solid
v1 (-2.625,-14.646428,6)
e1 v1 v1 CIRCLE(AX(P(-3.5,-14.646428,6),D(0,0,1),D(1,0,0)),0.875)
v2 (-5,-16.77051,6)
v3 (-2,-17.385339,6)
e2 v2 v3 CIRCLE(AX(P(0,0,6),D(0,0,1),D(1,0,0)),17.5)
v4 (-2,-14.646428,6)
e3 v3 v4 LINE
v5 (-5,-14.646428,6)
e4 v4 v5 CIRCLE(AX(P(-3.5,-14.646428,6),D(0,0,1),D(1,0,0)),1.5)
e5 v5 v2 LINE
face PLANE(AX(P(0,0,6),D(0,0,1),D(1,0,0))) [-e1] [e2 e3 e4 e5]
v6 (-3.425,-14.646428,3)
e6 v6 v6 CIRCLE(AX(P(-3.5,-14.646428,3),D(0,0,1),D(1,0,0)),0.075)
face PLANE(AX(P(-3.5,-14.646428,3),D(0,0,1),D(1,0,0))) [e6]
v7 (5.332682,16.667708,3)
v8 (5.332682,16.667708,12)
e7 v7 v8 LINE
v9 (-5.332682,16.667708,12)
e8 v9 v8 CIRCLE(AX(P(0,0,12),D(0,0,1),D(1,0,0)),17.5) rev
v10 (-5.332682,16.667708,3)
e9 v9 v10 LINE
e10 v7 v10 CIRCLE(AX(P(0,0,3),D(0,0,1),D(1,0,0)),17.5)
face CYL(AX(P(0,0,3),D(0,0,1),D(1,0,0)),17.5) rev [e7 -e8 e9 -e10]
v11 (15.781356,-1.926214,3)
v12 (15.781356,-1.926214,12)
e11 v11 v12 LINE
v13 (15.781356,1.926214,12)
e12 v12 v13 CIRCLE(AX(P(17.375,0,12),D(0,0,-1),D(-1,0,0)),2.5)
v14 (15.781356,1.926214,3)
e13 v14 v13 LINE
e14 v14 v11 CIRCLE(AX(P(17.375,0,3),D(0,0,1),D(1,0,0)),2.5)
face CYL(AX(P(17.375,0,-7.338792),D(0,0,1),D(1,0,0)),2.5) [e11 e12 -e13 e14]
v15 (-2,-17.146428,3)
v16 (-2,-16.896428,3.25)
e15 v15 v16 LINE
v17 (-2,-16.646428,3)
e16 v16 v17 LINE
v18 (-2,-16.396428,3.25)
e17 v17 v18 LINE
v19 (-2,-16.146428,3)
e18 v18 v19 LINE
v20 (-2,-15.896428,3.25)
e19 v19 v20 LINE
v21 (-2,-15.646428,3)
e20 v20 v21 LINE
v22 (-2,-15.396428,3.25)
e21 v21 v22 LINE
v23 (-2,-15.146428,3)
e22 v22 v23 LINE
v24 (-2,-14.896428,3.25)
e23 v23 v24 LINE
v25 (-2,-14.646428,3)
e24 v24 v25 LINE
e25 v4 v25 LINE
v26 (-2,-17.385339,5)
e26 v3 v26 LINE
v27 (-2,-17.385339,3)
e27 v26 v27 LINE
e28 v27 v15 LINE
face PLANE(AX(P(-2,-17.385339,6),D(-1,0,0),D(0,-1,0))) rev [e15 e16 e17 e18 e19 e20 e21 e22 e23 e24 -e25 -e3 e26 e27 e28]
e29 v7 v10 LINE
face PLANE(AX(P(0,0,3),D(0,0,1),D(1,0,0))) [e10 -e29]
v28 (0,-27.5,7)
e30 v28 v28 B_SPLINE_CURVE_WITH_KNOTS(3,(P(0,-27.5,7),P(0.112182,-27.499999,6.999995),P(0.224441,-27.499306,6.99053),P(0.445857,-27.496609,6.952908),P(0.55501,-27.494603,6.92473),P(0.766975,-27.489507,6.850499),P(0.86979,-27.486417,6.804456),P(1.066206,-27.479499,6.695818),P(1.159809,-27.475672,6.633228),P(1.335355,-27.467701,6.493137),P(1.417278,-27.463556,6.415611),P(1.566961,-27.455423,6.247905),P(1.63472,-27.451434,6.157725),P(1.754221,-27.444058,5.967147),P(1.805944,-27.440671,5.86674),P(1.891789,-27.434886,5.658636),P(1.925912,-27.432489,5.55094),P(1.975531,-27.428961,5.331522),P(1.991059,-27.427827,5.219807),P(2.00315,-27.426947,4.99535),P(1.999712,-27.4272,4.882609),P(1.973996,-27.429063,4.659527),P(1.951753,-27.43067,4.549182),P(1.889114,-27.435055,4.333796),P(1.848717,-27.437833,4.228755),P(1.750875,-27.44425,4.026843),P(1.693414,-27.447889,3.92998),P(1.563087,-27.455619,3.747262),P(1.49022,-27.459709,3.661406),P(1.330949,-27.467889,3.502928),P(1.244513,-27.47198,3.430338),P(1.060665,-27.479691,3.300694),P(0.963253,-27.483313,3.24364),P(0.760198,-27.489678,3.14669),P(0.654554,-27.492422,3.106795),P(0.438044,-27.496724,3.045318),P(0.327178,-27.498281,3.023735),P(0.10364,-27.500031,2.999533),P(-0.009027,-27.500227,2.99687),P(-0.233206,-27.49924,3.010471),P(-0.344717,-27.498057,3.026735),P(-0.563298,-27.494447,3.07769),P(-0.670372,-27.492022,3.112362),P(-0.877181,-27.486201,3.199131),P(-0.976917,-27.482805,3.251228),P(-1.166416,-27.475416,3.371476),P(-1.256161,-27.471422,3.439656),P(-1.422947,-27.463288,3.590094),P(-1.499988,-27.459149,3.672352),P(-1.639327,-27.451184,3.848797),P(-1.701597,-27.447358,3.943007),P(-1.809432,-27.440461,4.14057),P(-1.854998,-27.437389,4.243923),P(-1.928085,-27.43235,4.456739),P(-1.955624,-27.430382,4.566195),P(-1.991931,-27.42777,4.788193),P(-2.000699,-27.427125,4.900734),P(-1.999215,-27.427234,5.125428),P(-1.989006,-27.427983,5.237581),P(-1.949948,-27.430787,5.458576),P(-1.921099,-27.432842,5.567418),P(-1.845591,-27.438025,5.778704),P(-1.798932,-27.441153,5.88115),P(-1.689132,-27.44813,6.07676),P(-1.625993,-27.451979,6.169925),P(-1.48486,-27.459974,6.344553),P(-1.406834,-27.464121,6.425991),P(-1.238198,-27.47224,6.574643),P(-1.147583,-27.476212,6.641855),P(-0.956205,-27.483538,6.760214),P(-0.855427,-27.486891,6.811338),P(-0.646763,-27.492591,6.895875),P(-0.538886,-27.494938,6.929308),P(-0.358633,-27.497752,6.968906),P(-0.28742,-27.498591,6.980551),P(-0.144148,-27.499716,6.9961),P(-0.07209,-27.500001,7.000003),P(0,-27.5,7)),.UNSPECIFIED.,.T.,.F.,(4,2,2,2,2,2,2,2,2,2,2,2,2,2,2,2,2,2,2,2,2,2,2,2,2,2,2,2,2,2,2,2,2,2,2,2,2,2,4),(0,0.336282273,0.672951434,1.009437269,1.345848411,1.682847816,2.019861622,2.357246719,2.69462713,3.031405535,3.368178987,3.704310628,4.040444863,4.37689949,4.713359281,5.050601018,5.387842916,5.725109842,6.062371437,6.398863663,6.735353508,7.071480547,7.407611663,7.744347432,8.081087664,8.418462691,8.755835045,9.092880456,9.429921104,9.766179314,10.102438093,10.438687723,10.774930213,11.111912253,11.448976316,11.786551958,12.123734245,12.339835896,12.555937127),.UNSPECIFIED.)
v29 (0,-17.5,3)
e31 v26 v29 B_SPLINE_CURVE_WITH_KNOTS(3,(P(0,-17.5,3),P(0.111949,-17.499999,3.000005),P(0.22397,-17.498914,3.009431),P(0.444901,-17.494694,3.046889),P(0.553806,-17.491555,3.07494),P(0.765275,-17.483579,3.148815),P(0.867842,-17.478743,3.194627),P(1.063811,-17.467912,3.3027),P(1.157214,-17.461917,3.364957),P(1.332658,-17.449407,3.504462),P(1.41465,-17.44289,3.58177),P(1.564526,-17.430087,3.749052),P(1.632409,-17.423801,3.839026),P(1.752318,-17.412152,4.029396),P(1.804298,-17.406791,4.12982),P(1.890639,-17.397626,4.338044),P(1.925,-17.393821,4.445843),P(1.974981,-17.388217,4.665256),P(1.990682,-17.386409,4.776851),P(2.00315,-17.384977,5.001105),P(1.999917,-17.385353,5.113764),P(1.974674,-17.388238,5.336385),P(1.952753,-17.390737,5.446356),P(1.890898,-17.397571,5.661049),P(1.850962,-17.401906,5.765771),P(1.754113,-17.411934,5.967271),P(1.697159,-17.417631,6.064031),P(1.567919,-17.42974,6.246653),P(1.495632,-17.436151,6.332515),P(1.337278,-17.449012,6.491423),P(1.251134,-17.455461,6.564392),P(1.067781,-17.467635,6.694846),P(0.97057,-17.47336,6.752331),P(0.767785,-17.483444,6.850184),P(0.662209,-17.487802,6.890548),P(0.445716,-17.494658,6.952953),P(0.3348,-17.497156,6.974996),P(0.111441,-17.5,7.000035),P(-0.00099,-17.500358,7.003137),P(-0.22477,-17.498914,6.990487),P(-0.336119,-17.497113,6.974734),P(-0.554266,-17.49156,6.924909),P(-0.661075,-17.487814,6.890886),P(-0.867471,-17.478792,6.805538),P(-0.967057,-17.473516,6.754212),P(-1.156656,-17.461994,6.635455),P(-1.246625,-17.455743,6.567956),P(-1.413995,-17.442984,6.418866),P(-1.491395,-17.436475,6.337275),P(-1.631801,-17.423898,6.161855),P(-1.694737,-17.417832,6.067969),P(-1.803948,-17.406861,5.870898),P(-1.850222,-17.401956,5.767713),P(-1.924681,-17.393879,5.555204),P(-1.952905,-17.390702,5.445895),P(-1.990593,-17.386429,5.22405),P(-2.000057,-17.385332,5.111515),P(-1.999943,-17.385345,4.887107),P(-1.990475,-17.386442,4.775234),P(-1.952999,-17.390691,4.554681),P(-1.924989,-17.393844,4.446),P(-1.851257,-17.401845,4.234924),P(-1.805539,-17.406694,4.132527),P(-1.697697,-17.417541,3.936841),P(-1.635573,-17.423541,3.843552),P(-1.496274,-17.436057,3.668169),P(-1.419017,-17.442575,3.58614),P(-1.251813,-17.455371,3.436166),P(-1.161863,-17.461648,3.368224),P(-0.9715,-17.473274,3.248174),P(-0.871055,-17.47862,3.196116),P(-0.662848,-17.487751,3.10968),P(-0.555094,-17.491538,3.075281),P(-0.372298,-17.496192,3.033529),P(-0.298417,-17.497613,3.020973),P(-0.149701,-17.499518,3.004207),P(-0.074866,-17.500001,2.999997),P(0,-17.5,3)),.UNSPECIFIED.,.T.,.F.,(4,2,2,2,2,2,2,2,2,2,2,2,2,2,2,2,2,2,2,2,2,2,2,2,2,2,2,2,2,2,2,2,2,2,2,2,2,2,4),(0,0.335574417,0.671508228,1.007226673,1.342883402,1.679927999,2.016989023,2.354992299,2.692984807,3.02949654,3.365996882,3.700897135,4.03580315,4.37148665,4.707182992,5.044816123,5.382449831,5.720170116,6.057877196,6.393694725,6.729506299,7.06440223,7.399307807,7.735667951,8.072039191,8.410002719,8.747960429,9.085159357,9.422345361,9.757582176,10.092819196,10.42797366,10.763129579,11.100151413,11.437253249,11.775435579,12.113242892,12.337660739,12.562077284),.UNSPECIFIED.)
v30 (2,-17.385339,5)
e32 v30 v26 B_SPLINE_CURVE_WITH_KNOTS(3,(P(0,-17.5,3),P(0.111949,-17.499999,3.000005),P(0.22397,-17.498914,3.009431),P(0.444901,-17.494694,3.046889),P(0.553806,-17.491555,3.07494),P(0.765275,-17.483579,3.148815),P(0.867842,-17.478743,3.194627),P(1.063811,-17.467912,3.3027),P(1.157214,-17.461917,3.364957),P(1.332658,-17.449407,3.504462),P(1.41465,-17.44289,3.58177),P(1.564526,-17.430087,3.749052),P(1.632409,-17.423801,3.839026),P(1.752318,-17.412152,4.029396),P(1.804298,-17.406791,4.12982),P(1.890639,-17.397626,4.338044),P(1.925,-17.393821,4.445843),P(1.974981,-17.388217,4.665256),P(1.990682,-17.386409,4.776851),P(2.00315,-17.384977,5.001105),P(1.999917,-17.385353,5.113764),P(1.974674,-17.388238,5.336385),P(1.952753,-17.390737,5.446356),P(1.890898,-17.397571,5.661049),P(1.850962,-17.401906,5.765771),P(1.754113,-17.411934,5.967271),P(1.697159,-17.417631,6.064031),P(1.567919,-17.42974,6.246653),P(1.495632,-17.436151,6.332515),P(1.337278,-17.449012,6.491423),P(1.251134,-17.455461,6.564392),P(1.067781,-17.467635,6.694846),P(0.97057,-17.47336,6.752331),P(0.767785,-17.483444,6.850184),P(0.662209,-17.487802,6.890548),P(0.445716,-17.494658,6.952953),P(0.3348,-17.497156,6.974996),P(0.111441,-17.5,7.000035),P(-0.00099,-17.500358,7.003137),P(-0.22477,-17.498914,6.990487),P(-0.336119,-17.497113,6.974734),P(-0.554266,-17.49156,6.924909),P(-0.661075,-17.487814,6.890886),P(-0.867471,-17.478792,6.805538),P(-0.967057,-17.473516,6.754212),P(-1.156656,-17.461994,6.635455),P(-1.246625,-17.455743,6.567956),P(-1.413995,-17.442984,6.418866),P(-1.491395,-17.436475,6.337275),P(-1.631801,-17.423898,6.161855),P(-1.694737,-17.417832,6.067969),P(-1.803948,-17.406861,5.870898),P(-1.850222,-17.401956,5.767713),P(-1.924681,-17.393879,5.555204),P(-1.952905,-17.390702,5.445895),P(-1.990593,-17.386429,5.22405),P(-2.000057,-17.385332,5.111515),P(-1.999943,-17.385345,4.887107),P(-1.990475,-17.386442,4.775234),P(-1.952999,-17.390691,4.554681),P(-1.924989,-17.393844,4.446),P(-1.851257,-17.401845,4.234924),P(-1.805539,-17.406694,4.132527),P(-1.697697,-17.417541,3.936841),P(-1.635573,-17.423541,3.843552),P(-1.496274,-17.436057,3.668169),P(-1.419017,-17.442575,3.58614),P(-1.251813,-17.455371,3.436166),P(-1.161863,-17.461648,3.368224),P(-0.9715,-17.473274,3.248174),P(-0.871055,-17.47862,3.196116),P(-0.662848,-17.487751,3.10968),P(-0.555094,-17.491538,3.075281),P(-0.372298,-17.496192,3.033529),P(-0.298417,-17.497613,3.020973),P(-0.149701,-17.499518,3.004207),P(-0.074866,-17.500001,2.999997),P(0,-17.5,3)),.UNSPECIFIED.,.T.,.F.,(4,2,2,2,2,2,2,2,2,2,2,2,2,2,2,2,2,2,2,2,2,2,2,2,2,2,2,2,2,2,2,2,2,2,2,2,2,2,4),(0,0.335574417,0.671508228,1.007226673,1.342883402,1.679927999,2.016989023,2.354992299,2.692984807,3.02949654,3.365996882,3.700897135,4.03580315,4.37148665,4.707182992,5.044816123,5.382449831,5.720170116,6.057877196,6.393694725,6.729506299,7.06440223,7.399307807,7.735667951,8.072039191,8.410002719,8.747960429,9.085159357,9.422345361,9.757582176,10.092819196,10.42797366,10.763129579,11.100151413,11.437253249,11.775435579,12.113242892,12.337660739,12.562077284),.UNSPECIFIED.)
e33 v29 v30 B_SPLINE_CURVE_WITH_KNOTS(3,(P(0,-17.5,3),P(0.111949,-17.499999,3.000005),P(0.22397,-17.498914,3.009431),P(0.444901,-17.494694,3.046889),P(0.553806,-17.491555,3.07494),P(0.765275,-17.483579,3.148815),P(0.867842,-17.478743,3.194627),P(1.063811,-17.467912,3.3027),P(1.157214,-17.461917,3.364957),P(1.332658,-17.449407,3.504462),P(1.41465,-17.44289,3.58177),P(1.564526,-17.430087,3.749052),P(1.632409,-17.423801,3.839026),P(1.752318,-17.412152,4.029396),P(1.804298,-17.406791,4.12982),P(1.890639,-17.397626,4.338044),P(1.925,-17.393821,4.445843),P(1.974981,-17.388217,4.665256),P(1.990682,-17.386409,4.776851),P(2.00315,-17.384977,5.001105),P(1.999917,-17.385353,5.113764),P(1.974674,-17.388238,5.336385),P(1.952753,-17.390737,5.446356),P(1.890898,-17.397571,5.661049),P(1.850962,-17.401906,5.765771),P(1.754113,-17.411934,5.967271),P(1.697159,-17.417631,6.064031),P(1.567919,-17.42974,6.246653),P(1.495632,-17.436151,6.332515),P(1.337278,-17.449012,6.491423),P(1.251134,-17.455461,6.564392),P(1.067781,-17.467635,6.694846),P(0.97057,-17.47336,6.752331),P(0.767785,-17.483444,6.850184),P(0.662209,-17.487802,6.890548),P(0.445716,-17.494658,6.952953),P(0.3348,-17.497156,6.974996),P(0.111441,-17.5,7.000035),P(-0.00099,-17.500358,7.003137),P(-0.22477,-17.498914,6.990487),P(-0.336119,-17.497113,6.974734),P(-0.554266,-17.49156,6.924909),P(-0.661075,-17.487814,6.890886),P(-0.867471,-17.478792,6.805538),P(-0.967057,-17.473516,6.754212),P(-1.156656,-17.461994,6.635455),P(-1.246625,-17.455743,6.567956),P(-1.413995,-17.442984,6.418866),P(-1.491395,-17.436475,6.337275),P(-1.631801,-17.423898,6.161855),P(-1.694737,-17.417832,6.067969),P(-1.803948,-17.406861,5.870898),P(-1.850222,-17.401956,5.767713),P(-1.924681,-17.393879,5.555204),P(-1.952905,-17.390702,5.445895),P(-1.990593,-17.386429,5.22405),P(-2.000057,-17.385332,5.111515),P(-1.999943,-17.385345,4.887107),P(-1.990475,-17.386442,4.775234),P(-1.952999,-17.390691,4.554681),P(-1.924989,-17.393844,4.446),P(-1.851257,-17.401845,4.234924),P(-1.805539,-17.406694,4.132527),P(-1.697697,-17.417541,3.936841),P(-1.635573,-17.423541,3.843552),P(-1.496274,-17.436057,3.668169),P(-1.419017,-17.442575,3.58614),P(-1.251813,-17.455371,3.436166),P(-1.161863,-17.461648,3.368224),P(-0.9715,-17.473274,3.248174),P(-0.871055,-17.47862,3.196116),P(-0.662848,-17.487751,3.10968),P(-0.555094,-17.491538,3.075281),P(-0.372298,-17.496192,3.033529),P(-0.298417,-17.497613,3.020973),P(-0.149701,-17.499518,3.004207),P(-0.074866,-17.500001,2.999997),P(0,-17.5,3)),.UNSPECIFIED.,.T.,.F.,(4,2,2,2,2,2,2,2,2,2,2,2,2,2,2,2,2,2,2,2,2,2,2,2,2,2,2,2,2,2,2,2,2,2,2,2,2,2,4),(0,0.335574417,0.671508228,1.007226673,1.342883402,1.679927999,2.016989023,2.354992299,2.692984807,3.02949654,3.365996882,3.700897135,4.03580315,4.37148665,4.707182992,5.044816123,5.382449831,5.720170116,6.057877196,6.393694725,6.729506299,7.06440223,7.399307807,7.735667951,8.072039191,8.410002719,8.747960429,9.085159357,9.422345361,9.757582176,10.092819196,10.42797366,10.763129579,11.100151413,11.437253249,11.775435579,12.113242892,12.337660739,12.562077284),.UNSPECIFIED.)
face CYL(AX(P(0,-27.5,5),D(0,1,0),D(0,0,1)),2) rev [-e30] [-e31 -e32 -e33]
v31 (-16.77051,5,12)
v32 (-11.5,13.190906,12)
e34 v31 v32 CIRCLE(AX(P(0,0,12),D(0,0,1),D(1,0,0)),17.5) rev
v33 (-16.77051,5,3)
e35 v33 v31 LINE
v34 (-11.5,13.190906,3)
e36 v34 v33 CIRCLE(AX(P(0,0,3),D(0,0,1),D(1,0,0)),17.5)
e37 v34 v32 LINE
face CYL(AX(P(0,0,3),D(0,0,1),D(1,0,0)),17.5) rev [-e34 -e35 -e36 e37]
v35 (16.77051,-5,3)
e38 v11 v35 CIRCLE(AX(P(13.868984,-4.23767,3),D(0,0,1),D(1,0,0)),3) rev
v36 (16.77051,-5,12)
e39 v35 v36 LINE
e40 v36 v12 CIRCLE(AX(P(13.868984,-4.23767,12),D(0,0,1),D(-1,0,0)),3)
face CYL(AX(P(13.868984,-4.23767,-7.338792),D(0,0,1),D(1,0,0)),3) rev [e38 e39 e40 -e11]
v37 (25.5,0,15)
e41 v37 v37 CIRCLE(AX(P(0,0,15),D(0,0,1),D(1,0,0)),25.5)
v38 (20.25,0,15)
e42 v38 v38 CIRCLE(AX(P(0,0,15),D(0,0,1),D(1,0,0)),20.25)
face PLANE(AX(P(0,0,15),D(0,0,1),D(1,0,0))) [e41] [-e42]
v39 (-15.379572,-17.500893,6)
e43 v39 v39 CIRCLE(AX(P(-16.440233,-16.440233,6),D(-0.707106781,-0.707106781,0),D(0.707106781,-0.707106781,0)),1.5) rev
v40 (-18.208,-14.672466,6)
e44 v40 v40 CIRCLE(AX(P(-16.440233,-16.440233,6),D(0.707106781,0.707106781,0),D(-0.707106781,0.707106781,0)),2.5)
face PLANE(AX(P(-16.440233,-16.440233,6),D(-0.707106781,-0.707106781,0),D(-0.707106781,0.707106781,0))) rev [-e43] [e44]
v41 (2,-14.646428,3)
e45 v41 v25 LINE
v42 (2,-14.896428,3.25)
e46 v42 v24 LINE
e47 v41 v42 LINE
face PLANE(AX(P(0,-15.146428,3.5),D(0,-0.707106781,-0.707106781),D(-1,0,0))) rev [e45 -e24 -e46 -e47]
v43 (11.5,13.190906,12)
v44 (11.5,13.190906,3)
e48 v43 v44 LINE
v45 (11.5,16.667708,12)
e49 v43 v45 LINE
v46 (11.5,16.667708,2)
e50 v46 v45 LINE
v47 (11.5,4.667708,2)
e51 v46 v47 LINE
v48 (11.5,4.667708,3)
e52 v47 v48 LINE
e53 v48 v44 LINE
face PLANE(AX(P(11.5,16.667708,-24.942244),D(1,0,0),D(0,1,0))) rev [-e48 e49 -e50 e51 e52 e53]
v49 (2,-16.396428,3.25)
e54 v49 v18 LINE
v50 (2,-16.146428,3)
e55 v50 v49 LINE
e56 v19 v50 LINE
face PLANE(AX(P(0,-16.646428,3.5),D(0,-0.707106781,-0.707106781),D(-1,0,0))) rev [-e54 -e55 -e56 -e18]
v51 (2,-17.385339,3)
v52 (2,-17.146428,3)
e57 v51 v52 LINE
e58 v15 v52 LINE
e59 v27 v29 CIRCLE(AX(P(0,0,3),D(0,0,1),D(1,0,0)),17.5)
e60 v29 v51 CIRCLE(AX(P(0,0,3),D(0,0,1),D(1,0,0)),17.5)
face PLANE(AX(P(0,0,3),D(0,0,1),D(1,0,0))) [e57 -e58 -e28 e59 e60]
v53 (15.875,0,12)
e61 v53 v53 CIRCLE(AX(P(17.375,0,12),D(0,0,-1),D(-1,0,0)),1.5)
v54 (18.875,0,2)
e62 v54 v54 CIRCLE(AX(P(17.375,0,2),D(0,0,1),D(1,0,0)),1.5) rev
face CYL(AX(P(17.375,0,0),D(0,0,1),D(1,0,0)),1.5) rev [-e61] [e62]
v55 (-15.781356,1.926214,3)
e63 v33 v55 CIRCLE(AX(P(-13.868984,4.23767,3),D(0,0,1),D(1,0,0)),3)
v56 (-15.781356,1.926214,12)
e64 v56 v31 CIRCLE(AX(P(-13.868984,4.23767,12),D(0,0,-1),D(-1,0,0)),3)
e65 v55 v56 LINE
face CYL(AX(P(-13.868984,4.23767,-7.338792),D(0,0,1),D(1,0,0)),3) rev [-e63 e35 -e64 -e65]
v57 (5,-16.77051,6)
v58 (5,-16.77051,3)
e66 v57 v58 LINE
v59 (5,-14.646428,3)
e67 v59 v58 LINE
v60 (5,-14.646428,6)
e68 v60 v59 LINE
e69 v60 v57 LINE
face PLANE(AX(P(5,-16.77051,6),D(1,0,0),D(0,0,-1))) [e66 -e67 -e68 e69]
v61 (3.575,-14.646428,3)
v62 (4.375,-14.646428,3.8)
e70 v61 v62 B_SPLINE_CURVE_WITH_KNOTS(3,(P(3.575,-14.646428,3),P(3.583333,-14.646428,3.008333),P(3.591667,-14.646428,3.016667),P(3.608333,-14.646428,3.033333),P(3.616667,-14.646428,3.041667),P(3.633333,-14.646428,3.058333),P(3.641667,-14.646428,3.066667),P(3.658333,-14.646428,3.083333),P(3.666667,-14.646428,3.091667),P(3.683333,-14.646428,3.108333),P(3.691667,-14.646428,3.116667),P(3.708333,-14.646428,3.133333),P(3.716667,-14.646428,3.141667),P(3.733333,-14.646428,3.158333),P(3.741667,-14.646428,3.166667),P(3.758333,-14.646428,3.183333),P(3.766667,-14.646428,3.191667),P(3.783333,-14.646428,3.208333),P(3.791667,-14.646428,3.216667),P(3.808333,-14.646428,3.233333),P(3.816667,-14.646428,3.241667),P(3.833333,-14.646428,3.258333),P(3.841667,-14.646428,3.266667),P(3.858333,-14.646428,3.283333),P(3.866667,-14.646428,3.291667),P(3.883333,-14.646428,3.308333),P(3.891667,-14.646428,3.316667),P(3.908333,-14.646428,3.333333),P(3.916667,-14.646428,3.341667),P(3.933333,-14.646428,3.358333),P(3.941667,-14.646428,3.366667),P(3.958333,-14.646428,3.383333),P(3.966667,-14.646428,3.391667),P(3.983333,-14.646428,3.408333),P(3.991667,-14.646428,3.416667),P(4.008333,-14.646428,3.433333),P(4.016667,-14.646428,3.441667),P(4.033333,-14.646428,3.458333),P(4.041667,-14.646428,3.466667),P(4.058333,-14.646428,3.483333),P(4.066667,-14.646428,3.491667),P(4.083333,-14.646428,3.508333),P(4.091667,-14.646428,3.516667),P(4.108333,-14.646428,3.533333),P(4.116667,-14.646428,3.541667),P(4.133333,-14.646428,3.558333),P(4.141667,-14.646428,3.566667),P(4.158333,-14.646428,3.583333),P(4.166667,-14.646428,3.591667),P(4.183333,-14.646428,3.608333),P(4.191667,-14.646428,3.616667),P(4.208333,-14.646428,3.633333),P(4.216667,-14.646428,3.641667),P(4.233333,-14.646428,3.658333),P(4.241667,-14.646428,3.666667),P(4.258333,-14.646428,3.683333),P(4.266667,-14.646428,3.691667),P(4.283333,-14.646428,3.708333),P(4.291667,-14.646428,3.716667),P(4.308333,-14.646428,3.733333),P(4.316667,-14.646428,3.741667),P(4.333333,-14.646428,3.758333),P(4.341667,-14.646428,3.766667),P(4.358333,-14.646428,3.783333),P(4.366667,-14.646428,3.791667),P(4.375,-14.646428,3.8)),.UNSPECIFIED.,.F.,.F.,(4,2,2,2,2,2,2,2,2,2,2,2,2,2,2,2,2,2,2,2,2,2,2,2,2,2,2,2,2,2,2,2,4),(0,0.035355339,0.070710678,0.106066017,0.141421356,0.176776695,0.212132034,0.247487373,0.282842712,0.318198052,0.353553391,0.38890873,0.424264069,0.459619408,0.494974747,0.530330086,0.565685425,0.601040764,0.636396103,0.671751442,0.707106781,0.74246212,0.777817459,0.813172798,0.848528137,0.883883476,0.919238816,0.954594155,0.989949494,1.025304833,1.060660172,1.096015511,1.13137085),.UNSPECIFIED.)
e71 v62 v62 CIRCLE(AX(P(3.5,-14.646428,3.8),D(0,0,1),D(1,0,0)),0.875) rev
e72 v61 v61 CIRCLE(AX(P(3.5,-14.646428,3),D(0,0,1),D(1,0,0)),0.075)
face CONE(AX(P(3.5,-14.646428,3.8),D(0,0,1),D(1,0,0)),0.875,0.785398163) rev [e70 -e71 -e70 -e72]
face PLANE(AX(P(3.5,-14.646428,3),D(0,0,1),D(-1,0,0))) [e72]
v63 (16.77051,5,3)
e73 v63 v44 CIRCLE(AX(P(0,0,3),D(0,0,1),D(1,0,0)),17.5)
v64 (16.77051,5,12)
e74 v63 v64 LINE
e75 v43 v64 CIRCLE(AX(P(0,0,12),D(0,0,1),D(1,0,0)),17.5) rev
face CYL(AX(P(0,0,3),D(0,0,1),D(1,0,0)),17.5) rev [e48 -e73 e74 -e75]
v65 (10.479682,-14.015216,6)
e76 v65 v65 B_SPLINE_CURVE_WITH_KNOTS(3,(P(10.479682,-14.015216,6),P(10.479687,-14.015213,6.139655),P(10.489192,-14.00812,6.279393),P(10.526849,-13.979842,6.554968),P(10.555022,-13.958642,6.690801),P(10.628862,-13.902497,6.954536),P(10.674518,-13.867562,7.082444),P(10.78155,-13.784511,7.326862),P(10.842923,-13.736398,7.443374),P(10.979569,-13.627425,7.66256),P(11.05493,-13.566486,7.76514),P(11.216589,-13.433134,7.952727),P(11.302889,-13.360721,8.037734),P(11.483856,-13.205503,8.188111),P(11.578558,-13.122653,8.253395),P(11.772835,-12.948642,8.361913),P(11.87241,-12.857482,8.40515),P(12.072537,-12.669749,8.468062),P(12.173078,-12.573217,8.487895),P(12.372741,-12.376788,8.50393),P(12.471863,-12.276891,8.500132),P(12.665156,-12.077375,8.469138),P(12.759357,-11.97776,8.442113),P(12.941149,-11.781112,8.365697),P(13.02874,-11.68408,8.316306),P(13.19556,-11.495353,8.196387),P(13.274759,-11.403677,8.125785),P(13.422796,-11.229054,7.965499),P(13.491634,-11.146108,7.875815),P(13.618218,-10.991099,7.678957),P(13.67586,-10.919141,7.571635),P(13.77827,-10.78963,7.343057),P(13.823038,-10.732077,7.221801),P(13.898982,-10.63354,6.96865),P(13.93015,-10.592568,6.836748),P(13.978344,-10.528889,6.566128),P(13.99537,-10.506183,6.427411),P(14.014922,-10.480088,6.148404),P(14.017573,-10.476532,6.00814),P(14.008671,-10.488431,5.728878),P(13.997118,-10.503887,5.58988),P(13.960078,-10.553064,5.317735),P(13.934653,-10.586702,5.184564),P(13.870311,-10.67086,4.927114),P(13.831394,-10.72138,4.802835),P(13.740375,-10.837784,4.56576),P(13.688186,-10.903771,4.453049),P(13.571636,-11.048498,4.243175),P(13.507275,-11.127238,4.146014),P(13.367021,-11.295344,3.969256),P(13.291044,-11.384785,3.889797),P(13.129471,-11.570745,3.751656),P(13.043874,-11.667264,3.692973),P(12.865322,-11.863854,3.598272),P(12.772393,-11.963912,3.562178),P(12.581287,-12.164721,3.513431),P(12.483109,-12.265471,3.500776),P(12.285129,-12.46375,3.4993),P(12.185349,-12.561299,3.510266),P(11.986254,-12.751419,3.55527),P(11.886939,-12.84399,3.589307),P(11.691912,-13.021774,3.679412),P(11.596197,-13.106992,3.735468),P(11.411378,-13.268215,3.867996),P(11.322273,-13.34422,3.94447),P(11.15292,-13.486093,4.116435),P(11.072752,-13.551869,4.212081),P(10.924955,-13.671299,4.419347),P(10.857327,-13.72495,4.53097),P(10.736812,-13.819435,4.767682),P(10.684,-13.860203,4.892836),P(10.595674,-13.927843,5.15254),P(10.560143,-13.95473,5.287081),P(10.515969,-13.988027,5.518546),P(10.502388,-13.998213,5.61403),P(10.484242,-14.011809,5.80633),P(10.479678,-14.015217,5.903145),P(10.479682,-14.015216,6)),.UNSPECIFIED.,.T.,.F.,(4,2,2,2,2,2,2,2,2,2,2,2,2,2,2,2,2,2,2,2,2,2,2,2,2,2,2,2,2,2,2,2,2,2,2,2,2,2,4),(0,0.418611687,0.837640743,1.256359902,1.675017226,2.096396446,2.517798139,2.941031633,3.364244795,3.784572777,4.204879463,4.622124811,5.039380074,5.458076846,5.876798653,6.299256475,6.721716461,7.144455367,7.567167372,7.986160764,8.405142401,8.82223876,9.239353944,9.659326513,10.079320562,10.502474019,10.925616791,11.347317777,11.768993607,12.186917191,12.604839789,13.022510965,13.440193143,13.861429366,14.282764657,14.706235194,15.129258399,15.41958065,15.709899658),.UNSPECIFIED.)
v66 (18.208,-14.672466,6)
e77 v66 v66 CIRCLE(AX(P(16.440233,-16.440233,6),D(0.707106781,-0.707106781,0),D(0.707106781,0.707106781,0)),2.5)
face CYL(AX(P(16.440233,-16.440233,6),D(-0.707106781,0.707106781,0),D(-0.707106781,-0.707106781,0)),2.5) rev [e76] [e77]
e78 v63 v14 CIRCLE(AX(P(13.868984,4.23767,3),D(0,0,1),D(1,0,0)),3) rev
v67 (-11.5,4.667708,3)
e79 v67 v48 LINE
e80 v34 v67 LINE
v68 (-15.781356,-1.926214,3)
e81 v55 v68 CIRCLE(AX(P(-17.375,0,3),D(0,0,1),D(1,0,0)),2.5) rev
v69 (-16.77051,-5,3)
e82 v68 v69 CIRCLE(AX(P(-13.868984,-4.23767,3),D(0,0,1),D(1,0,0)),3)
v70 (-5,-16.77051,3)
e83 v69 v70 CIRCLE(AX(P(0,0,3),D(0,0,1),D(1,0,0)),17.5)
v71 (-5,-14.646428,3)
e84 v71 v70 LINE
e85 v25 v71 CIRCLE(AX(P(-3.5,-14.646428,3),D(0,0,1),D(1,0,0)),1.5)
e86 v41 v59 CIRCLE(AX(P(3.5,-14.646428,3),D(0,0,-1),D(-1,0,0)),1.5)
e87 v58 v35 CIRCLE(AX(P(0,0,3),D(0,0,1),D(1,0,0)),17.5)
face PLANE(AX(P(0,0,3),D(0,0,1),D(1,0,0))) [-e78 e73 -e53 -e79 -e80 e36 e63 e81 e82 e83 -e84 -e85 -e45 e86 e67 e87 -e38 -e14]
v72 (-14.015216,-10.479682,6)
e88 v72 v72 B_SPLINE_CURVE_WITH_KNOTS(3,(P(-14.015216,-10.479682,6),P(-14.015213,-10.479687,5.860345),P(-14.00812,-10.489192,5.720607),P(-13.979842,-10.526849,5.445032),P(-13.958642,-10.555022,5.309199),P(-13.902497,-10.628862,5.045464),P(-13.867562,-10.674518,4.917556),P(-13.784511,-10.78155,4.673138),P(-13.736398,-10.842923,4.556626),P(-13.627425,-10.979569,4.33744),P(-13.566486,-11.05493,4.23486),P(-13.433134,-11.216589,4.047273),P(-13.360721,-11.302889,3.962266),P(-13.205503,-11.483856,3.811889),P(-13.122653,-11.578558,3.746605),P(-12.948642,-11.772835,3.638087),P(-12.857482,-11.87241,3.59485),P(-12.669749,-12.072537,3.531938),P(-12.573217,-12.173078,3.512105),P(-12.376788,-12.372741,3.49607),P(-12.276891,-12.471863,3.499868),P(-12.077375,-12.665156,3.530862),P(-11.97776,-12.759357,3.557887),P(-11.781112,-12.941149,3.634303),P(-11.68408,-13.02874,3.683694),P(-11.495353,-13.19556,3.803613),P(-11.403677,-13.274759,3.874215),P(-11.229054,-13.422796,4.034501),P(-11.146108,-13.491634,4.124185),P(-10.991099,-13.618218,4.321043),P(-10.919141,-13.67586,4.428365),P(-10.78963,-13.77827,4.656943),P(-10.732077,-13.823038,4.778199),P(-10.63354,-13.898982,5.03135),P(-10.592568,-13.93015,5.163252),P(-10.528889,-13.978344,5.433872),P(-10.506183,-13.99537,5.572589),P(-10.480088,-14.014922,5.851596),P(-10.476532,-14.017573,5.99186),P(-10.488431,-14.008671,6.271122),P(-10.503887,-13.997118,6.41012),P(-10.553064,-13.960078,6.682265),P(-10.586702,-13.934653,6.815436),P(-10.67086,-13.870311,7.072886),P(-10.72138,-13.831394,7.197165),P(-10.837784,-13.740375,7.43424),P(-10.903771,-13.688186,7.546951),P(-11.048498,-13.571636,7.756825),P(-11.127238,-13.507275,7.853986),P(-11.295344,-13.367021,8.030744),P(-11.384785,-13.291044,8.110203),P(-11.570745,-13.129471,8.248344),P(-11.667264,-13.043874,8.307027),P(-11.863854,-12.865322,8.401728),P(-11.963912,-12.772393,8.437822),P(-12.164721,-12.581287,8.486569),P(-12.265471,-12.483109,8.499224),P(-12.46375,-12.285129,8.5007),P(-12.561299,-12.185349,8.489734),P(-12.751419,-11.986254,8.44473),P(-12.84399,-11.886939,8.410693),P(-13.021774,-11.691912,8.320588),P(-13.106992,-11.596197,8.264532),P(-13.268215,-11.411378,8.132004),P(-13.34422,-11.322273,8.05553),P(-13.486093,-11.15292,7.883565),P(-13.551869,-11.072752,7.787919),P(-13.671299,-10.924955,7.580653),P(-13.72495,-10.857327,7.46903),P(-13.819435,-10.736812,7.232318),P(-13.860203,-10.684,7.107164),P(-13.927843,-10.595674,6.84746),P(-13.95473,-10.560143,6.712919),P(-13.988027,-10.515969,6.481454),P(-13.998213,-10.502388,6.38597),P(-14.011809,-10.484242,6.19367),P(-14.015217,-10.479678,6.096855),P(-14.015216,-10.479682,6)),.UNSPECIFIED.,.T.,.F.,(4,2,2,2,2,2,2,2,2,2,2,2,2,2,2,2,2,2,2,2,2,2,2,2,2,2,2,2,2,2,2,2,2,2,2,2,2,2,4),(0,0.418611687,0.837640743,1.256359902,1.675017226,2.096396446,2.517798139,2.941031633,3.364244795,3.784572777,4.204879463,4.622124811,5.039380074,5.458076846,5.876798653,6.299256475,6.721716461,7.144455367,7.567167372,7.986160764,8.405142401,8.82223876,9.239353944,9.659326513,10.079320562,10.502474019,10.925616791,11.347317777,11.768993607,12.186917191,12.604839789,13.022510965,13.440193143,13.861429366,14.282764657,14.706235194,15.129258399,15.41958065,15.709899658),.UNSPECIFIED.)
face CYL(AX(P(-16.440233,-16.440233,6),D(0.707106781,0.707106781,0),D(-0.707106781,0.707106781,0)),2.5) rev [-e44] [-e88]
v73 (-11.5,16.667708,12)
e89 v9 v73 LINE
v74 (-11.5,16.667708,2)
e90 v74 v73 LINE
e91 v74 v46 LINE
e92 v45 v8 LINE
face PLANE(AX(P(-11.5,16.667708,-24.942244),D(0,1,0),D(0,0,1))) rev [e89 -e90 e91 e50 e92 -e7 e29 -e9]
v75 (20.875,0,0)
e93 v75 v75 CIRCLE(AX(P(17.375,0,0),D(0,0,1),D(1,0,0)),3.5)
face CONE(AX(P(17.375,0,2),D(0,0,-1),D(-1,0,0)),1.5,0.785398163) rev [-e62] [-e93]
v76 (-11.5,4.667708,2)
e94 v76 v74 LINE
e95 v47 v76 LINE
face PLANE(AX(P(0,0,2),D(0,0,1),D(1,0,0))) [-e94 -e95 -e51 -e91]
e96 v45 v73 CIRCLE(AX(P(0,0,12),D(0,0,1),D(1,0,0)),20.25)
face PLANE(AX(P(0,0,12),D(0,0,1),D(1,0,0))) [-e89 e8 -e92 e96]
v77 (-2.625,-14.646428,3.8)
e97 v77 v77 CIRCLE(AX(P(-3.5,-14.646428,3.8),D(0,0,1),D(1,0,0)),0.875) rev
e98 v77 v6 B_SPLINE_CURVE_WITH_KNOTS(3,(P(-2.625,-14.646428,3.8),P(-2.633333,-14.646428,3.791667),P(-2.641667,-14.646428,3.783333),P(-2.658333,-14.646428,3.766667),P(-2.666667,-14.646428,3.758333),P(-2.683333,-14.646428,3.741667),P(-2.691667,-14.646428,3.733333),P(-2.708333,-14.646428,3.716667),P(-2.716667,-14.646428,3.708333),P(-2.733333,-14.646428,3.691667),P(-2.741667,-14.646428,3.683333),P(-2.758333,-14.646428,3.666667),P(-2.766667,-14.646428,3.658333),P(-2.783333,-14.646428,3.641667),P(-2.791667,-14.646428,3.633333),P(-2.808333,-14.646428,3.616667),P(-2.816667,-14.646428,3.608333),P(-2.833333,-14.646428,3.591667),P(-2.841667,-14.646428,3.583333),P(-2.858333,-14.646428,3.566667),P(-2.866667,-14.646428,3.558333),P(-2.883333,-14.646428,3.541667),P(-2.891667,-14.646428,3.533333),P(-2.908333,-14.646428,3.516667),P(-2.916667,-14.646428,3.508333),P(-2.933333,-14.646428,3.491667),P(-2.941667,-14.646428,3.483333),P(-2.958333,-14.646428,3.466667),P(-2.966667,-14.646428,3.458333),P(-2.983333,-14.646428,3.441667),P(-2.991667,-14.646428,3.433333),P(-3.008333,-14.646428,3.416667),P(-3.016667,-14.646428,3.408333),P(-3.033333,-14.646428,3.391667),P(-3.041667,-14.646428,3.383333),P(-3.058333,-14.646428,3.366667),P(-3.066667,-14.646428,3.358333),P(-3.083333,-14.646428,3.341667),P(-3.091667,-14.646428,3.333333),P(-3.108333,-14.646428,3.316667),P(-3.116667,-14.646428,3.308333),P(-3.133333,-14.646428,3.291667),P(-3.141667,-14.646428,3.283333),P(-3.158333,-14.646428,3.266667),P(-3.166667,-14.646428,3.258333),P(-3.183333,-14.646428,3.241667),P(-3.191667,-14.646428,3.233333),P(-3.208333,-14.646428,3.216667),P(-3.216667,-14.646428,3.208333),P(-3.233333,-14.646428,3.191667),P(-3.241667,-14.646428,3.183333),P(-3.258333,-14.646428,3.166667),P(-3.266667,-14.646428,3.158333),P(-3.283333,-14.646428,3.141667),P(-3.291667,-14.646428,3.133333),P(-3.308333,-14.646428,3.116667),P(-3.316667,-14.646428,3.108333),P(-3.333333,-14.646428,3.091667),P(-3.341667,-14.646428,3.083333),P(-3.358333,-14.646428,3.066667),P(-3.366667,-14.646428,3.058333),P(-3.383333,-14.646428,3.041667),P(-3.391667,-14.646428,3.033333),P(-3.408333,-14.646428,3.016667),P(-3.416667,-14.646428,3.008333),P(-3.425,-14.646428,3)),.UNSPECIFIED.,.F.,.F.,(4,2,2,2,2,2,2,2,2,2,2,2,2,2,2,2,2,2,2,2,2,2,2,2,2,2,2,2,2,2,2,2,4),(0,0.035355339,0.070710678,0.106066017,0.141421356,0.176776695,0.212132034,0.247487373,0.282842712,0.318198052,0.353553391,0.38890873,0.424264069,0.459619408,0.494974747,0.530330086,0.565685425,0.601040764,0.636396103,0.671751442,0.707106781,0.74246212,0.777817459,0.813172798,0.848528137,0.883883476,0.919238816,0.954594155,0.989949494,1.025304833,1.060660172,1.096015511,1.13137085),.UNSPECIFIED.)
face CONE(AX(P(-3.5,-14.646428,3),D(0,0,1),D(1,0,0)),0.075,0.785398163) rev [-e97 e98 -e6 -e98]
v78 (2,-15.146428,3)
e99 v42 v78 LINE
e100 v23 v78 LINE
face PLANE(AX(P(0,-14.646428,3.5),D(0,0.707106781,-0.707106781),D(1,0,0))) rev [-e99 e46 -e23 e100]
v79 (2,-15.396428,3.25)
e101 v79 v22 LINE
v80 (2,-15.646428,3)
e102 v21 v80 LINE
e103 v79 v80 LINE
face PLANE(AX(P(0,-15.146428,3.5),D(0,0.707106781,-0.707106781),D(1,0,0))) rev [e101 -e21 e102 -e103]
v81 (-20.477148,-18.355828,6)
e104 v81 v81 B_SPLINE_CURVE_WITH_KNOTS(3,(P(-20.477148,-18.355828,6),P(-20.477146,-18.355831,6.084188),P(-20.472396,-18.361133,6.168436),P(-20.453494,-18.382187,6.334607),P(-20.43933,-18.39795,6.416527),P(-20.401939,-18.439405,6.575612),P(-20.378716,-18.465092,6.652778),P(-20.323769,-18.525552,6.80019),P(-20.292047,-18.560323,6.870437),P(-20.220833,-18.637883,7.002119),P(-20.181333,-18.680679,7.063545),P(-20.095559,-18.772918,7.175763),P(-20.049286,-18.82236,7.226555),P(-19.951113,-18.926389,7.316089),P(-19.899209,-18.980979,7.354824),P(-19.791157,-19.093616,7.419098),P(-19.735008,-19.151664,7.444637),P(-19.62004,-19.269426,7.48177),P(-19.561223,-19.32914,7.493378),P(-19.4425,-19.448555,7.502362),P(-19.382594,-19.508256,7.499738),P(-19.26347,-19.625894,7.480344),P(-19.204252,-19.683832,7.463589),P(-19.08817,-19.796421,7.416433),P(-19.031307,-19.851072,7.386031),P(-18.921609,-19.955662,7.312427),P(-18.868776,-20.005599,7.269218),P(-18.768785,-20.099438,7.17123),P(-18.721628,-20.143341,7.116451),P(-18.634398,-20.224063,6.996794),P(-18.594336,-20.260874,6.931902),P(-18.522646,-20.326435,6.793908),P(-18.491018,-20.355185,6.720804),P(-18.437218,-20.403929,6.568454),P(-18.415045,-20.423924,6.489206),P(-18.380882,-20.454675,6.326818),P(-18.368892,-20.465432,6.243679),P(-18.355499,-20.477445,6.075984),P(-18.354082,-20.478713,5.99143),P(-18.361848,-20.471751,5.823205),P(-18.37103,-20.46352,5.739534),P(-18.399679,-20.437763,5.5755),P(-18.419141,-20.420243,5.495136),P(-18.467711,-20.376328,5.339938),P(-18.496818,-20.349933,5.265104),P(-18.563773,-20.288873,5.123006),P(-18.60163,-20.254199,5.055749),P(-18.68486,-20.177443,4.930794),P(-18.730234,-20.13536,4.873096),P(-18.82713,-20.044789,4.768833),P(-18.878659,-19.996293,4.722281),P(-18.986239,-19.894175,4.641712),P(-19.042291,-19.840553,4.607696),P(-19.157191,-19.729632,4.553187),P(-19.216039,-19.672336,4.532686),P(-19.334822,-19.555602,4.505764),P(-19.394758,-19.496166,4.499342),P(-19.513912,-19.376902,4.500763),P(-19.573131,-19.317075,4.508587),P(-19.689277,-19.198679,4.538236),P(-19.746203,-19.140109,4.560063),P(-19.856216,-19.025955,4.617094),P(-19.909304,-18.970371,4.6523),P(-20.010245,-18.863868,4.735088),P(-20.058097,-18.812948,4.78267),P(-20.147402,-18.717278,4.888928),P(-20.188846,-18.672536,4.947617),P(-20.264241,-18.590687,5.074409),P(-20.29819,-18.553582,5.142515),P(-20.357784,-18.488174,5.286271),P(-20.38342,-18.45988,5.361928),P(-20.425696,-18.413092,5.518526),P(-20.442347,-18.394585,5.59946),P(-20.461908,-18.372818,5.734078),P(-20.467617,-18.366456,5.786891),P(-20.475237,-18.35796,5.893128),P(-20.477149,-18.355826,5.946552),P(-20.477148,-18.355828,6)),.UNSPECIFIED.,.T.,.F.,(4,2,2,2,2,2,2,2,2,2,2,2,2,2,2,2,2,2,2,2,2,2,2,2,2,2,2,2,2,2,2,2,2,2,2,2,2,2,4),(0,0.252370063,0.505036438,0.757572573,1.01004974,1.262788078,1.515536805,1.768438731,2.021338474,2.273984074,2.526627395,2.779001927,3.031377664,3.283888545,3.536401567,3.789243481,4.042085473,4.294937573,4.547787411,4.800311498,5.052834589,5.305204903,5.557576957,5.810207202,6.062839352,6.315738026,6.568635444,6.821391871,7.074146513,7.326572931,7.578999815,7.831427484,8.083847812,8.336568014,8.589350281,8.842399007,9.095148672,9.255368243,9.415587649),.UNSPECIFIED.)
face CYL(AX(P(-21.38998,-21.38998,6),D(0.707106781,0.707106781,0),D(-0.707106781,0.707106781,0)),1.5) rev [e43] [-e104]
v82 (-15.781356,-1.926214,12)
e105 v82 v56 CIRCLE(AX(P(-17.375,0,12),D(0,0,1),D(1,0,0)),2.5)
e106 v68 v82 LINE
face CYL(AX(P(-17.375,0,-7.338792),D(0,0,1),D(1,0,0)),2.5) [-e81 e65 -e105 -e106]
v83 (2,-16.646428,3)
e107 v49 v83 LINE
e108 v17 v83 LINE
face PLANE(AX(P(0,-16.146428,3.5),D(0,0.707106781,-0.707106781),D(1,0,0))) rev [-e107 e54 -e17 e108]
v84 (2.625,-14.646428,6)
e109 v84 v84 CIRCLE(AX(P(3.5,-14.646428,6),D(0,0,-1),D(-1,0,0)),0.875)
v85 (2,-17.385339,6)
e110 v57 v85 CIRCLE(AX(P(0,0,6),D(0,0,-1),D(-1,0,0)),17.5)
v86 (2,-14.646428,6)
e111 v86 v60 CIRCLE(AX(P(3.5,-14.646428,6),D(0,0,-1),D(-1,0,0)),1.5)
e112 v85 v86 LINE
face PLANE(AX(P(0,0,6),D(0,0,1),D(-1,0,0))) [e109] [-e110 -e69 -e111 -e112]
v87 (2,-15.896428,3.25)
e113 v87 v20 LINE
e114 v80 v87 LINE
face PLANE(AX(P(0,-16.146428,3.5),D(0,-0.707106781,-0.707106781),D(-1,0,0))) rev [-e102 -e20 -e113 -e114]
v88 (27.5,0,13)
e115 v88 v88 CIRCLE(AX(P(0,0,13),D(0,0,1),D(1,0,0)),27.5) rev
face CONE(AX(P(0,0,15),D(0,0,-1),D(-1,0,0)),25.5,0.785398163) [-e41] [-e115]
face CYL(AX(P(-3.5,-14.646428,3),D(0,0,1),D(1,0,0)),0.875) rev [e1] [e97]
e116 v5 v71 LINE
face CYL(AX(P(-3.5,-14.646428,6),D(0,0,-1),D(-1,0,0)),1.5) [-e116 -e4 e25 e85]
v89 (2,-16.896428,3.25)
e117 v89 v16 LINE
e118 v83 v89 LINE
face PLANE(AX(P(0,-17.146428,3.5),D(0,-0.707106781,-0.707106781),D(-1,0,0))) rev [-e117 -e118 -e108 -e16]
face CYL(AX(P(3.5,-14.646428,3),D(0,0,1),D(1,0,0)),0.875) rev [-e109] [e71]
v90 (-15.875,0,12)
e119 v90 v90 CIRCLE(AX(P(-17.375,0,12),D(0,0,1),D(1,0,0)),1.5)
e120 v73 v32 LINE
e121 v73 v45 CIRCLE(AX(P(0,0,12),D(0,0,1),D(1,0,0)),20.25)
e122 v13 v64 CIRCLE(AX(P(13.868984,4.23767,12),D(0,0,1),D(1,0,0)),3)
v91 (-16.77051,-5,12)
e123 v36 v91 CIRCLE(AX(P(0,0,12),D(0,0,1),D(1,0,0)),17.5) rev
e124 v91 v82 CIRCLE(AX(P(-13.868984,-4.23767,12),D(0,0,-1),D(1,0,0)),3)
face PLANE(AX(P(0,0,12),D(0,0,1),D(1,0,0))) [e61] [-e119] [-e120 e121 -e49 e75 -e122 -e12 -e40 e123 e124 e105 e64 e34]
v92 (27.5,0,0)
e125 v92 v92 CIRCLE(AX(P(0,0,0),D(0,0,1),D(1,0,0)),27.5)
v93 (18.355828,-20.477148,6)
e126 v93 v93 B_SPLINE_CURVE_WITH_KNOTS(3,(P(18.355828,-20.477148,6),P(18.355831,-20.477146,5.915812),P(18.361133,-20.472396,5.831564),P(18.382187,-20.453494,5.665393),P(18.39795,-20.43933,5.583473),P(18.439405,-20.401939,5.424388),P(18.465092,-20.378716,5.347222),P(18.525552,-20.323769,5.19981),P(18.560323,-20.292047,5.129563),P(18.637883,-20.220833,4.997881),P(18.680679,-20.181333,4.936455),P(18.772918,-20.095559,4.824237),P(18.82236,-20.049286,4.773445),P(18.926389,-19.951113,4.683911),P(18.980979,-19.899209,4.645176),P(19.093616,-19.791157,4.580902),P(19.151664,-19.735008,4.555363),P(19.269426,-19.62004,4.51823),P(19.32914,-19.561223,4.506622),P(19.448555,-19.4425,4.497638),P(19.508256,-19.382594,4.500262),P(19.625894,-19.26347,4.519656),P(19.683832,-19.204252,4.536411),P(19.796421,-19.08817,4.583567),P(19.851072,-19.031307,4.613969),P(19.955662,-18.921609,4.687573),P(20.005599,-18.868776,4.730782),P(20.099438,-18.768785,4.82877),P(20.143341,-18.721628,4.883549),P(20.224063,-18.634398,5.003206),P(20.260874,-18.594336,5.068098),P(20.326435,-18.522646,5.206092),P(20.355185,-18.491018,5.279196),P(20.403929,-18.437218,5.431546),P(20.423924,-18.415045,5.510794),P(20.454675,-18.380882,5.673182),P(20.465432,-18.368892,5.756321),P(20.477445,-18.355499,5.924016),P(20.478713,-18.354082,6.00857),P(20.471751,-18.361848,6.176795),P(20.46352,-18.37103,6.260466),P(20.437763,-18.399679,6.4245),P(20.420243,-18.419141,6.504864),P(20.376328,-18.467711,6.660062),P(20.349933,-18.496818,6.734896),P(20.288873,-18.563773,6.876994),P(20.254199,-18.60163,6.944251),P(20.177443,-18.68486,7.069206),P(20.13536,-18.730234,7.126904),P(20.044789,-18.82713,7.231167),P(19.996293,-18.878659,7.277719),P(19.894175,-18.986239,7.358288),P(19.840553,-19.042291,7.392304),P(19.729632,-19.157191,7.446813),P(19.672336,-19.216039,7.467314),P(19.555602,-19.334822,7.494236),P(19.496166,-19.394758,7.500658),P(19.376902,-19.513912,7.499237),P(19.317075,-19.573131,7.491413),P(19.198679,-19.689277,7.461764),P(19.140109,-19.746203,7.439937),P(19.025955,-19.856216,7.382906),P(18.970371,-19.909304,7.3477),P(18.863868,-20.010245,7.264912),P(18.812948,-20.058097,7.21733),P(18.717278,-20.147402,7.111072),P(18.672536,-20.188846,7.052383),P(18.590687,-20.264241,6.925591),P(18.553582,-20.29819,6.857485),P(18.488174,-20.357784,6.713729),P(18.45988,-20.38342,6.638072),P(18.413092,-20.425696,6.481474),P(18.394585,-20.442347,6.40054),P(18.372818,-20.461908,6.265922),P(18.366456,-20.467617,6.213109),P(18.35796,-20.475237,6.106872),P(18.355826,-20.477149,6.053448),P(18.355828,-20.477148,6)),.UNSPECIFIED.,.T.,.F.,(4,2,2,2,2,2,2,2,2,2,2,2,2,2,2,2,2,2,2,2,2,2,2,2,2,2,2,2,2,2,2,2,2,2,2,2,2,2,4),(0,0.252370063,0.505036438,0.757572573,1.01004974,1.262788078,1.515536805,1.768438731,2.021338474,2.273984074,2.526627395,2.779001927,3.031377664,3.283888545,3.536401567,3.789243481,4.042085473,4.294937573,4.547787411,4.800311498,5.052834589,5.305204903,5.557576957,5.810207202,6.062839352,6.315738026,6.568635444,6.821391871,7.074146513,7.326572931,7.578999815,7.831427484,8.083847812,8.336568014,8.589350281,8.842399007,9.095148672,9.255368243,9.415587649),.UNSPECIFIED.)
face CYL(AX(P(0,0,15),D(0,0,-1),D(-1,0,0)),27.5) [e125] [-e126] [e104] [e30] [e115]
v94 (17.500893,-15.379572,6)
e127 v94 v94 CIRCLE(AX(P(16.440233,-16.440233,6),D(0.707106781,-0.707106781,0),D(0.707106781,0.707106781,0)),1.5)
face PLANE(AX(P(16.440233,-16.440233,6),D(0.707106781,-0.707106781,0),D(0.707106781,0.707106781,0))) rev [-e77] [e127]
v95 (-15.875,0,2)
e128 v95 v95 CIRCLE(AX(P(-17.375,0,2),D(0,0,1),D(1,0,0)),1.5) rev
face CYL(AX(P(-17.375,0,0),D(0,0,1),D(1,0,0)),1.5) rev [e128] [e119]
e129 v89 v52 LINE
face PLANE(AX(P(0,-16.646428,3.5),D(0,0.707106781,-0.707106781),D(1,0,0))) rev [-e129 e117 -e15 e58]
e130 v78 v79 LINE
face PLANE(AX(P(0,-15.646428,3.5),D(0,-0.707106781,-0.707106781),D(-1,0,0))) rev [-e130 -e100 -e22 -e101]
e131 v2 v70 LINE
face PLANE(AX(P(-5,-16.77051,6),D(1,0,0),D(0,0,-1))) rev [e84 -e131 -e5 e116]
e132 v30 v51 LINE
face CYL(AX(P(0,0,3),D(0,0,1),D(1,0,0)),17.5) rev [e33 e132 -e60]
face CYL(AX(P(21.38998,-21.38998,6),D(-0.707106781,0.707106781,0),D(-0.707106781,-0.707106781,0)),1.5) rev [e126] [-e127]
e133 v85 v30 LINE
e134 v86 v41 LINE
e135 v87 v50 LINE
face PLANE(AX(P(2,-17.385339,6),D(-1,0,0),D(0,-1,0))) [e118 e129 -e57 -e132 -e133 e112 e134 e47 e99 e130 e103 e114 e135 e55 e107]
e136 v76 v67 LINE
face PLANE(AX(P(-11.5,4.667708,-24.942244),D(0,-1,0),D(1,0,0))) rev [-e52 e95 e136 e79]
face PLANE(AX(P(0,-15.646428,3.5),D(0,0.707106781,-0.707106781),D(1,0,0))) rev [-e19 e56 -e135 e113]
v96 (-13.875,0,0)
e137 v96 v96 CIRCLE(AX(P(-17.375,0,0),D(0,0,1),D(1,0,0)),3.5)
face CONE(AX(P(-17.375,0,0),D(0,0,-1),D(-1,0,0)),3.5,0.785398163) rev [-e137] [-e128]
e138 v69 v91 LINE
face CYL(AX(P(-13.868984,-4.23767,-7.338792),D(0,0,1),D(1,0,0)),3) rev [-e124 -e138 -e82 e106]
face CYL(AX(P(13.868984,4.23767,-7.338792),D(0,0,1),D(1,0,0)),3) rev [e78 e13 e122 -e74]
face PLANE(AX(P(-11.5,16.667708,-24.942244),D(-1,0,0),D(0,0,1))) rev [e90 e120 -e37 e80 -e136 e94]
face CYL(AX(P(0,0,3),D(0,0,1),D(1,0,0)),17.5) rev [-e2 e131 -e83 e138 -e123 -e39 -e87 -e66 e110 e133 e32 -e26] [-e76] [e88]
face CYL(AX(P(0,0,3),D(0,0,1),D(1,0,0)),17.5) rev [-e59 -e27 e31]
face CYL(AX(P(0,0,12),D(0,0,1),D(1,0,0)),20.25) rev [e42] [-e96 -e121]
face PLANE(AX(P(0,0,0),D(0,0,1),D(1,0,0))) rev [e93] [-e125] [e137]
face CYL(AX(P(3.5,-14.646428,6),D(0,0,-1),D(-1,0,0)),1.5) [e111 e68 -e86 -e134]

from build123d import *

# Parameters (mm, degrees)
SKETCH1_R                = 27.5
BOSS_EXTRUDE1_DEPTH      = 15
CHAMFER1_SIZE            = 2
SKETCH2_R                = 17.5
CUT_EXTRUDE1_DEPTH       = 12
SKETCH3_R                = 20.25
CUT_EXTRUDE2_DEPTH       = 3
SKETCH4_R                = 2
CUT_EXTRUDE3_DEPTH       = 42.683330001
BOSS_EXTRUDE2_DEPTH      = 9
SKETCH6_R                = 1.5
CUT_EXTRUDE4_DEPTH       = 41.700123015
CHAMFER2_SIZE            = 2
CHAMFER2_OF_MIRROR1_SIZE = 2
BOSS_EXTRUDE8_START      = 3
BOSS_EXTRUDE8_DEPTH      = 3
SKETCH14_W               = 23
SKETCH14_H               = 12
CUT_EXTRUDE5_DEPTH       = 10
SKETCH16_R               = 1.5
CUT_EXTRUDE6_DEPTH       = 10
SKETCH17_R               = 2.5
CUT_EXTRUDE7_DEPTH       = 6
SKETCH18_R               = 0.875
CUT_EXTRUDE8_DEPTH       = 3
CHAMFER3_SIZE            = 0.8
SKETCH19_W               = 4
SKETCH19_H               = 0.5
BOSS_EXTRUDE9_DEPTH      = 0.5
CHAMFER4_SIZE            = 0.5
LPATTERN1_START          = -8.942375138
LPATTERN1_OUTLINE_W      = 6
LPATTERN1_OUTLINE_H      = 2.185015825
LPATTERN1_DEPTH          = 0.353553391
LPATTERN1_START_2        = -9.649481919
LPATTERN1_2_OUTLINE_W    = 6
LPATTERN1_2_OUTLINE_H    = 0.353553391
LPATTERN1_2_DEPTH        = 0.353553391
LPATTERN1_START_3        = -10.003035309
LPATTERN1_3_OUTLINE_W    = 6
LPATTERN1_3_OUTLINE_H    = 0.353553391
LPATTERN1_3_DEPTH        = 0.35355339
LPATTERN1_START_4        = -9.295928528
LPATTERN1_4_OUTLINE_W    = 6
LPATTERN1_4_OUTLINE_H    = 0.35355339
LPATTERN1_4_DEPTH        = 0.35355339


# Read off the part's stored shape, not the designer's step: LPattern1
with BuildPart() as part:
    # Sketch1 → Boss-Extrude1 (new body)
    with BuildSketch(Plane.XY):
        Circle(SKETCH1_R)
    extrude(amount=BOSS_EXTRUDE1_DEPTH)

    # Chamfer1
    chamfer1_edges = [part.edges().sort_by_distance(p)[0] for p in [
        (-27.5, 0, 15),
    ]]
    chamfer(chamfer1_edges, length=CHAMFER1_SIZE)

    # Sketch2 → Cut-Extrude1 (cut)
    with BuildSketch(Plane.XY.offset(15)):
        Circle(SKETCH2_R)
    extrude(amount=-CUT_EXTRUDE1_DEPTH, mode=Mode.SUBTRACT)

    # Sketch3 → Cut-Extrude2 (cut)
    with BuildSketch(Plane.XY.offset(15)):
        Circle(SKETCH3_R)
    extrude(amount=-CUT_EXTRUDE2_DEPTH, mode=Mode.SUBTRACT)

    # Sketch4 → Cut-Extrude3 (cut, through all)
    with BuildSketch(Plane(origin=(0, 0, 0), x_dir=(1, 0, 0), z_dir=(0, 1, 0))):
        with Locations(Location((0, -5, 0), (0, 0, 270))):
            Circle(SKETCH4_R)
    extrude(amount=-CUT_EXTRUDE3_DEPTH, mode=Mode.SUBTRACT)

    # Sketch5 → Boss-Extrude2 (add)
    with BuildSketch(Plane.XY.offset(12)):
        with BuildLine():
            ThreePointArc((-15.781356255, -1.926213803), (-14.875, 0), (-15.781356255, 1.926213803))
            ThreePointArc((-15.781356255, 1.926213803), (-16.724757779, 3.318673761), (-16.770509831, 5))
            ThreePointArc((-16.770509831, 5), (-17.5, 0), (-16.770509831, -5))
            ThreePointArc((-16.770509831, -5), (-16.724757779, -3.318673761), (-15.781356255, -1.926213803))
        make_face()
    boss_extrude2 = extrude(amount=-BOSS_EXTRUDE2_DEPTH)

    # Sketch6 → Cut-Extrude4 (cut, through all)
    with BuildSketch(Plane.XY.offset(12)):
        with Locations((-17.375, 0)):
            Circle(SKETCH6_R)
    cut_extrude4 = extrude(amount=-CUT_EXTRUDE4_DEPTH, mode=Mode.SUBTRACT)

    # Chamfer2
    chamfer2_edges = [part.edges().sort_by_distance(p)[0] for p in [
        (-18.875, 0, 0),
    ]]
    chamfer(chamfer2_edges, length=CHAMFER2_SIZE)

    # Mirror1: Boss-Extrude2, Cut-Extrude4 across plane
    add(boss_extrude2.mirror(Plane(origin=(0, 0, 0), x_dir=(0, 0, 1), z_dir=(1, 0, 0))))
    add(cut_extrude4.mirror(Plane(origin=(0, 0, 0), x_dir=(0, 0, 1), z_dir=(1, 0, 0))), mode=Mode.SUBTRACT)

    # Chamfer2 of Mirror1
    chamfer2_of_mirror1_edges = [part.edges().sort_by_distance(p)[0] for p in [
        (18.875, 0, 0),
    ]]
    chamfer(chamfer2_of_mirror1_edges, length=CHAMFER2_OF_MIRROR1_SIZE)

    # Sketch8 → Boss-Extrude8 (add)
    with BuildSketch(Plane.XY.offset(3).offset(BOSS_EXTRUDE8_START)):
        with BuildLine():
            Line((-2, -17.385338651), (-2, -14.646428199))
            ThreePointArc((-2, -14.646428199), (-3.5, -13.146428199), (-5, -14.646428199))
            Line((-5, -14.646428199), (-5, -16.770509831))
            ThreePointArc((-5, -16.770509831), (-3.513474579, -17.143672196), (-2, -17.385338651))
        make_face()
    boss_extrude8 = extrude(amount=-BOSS_EXTRUDE8_DEPTH)

    # Sketch14 → Cut-Extrude5 (cut)
    with BuildSketch(Plane.XY.offset(12)):
        with Locations((0, 10.667708301)):
            Rectangle(SKETCH14_W, SKETCH14_H)
    extrude(amount=-CUT_EXTRUDE5_DEPTH, mode=Mode.SUBTRACT)

    # Sketch16 → Cut-Extrude6 (cut, symmetric)
    with BuildSketch(Plane(origin=(14.318912319, -14.318912319, 3), x_dir=(0, 0, -1), z_dir=(0.7071067811865489, -0.7071067811865462, 0))):
        with Locations(Location((-3, 0, 0), (0, 0, 270))):
            Circle(SKETCH16_R)
    cut_extrude6 = extrude(amount=CUT_EXTRUDE6_DEPTH, both=True, mode=Mode.SUBTRACT)

    # Sketch17 → Cut-Extrude7 (cut)
    with BuildSketch(Plane(origin=(12.197591975, -12.197591975, 3), x_dir=(0, 0, -1), z_dir=(0.7071067811865489, -0.7071067811865462, 0))):
        with Locations(Location((-3, 0, 0), (0, 0, 270))):
            Circle(SKETCH17_R)
    cut_extrude7 = extrude(amount=CUT_EXTRUDE7_DEPTH, mode=Mode.SUBTRACT)

    # Mirror2: Cut-Extrude6, Cut-Extrude7 across plane
    add(cut_extrude6.mirror(Plane(origin=(0, 0, 0), x_dir=(0, 0, 1), z_dir=(1, 0, 0))), mode=Mode.SUBTRACT)
    add(cut_extrude7.mirror(Plane(origin=(0, 0, 0), x_dir=(0, 0, 1), z_dir=(1, 0, 0))), mode=Mode.SUBTRACT)

    # Sketch18 → Cut-Extrude8 (cut)
    with BuildSketch(Plane.XY.offset(6)):
        with Locations((-3.5, -14.646428199)):
            Circle(SKETCH18_R)
    cut_extrude8 = extrude(amount=-CUT_EXTRUDE8_DEPTH, mode=Mode.SUBTRACT)

    # Mirror5: Boss-Extrude8, Cut-Extrude8 across plane
    add(boss_extrude8.mirror(Plane(origin=(0, 0, 0), x_dir=(0, 0, 1), z_dir=(1, 0, 0))))
    add(cut_extrude8.mirror(Plane(origin=(0, 0, 0), x_dir=(0, 0, 1), z_dir=(1, 0, 0))), mode=Mode.SUBTRACT)

    # Chamfer3
    chamfer3_edges = [part.edges().sort_by_distance(p)[0] for p in [
        (-4.375, -14.646428199, 3),
        (4.375, -14.646428199, 3),
    ]]
    chamfer(chamfer3_edges, length=CHAMFER3_SIZE)

    # Sketch19 → Boss-Extrude9 (add)
    with BuildSketch(Plane.XY.offset(3)):
        with Locations((0, -14.896428199)):
            Rectangle(SKETCH19_W, SKETCH19_H)
    extrude(amount=BOSS_EXTRUDE9_DEPTH)

    # Chamfer4
    # the kernel refuses this chamfer: 0.5 mm, written as the material it takes off along each edge
    with BuildSketch(Plane(origin=(-2, -15.146428199, 3.5), x_dir=(0, -0.027495876610585623, -0.9996219169112968), z_dir=(1, 0, 0))) as chamfer4_piece_1:
        Polygon((CHAMFER4_SIZE * 0.999621916911, CHAMFER4_SIZE * 0.0274958766106), (-CHAMFER4_SIZE * 0.0274958766106, CHAMFER4_SIZE * 0.999621916911), (0, 0), align=None)
    extrude(amount=4, mode=Mode.SUBTRACT)
    with BuildSketch(Plane(origin=(2, -14.646428199, 3.5), x_dir=(0, -0.9996219169112968, 0.02749587661058651), z_dir=(-1, 0, 0))) as chamfer4_piece_2:
        Polygon((CHAMFER4_SIZE * 0.999621916911, -CHAMFER4_SIZE * 0.0274958766106), (-CHAMFER4_SIZE * 0.0274958766106, -CHAMFER4_SIZE * 0.999621916911), (0, 0), align=None)
    extrude(amount=4, mode=Mode.SUBTRACT)

    # LPattern1 outline → LPattern1 (add)
    with BuildSketch(Plane(origin=(0, 0, 0), x_dir=(1, 0, 0), z_dir=(0, 0.7071067811865476, 0.7071067811865476)).offset(LPATTERN1_START)):
        with Locations((0, -12.092507913)):
            Rectangle(LPATTERN1_OUTLINE_W, LPATTERN1_OUTLINE_H)
    extrude(amount=LPATTERN1_DEPTH)

    # LPattern1 2 outline → LPattern1 2 (add)
    with BuildSketch(Plane(origin=(0, 0, 0), x_dir=(1, 0, 0), z_dir=(0, 0.7071067811865476, 0.7071067811865476)).offset(LPATTERN1_START_2)):
        with Locations((0, -13.715345911)):
            Rectangle(LPATTERN1_2_OUTLINE_W, LPATTERN1_2_OUTLINE_H)
    extrude(amount=LPATTERN1_2_DEPTH)

    # LPattern1 3 outline → LPattern1 3 (add)
    with BuildSketch(Plane(origin=(0, 0, 0), x_dir=(1, 0, 0), z_dir=(0, 0.7071067811865476, 0.7071067811865476)).offset(LPATTERN1_START_3)):
        with Locations((0, -14.068899302)):
            Rectangle(LPATTERN1_3_OUTLINE_W, LPATTERN1_3_OUTLINE_H)
    extrude(amount=LPATTERN1_3_DEPTH)

    # LPattern1 4 outline → LPattern1 4 (add)
    with BuildSketch(Plane(origin=(0, 0, 0), x_dir=(1, 0, 0), z_dir=(0, 0.7071067811865476, 0.7071067811865476)).offset(LPATTERN1_START_4)):
        with Locations((0, -13.36179252)):
            Rectangle(LPATTERN1_4_OUTLINE_W, LPATTERN1_4_OUTLINE_H)
    extrude(amount=LPATTERN1_4_DEPTH)


solid = part.part
